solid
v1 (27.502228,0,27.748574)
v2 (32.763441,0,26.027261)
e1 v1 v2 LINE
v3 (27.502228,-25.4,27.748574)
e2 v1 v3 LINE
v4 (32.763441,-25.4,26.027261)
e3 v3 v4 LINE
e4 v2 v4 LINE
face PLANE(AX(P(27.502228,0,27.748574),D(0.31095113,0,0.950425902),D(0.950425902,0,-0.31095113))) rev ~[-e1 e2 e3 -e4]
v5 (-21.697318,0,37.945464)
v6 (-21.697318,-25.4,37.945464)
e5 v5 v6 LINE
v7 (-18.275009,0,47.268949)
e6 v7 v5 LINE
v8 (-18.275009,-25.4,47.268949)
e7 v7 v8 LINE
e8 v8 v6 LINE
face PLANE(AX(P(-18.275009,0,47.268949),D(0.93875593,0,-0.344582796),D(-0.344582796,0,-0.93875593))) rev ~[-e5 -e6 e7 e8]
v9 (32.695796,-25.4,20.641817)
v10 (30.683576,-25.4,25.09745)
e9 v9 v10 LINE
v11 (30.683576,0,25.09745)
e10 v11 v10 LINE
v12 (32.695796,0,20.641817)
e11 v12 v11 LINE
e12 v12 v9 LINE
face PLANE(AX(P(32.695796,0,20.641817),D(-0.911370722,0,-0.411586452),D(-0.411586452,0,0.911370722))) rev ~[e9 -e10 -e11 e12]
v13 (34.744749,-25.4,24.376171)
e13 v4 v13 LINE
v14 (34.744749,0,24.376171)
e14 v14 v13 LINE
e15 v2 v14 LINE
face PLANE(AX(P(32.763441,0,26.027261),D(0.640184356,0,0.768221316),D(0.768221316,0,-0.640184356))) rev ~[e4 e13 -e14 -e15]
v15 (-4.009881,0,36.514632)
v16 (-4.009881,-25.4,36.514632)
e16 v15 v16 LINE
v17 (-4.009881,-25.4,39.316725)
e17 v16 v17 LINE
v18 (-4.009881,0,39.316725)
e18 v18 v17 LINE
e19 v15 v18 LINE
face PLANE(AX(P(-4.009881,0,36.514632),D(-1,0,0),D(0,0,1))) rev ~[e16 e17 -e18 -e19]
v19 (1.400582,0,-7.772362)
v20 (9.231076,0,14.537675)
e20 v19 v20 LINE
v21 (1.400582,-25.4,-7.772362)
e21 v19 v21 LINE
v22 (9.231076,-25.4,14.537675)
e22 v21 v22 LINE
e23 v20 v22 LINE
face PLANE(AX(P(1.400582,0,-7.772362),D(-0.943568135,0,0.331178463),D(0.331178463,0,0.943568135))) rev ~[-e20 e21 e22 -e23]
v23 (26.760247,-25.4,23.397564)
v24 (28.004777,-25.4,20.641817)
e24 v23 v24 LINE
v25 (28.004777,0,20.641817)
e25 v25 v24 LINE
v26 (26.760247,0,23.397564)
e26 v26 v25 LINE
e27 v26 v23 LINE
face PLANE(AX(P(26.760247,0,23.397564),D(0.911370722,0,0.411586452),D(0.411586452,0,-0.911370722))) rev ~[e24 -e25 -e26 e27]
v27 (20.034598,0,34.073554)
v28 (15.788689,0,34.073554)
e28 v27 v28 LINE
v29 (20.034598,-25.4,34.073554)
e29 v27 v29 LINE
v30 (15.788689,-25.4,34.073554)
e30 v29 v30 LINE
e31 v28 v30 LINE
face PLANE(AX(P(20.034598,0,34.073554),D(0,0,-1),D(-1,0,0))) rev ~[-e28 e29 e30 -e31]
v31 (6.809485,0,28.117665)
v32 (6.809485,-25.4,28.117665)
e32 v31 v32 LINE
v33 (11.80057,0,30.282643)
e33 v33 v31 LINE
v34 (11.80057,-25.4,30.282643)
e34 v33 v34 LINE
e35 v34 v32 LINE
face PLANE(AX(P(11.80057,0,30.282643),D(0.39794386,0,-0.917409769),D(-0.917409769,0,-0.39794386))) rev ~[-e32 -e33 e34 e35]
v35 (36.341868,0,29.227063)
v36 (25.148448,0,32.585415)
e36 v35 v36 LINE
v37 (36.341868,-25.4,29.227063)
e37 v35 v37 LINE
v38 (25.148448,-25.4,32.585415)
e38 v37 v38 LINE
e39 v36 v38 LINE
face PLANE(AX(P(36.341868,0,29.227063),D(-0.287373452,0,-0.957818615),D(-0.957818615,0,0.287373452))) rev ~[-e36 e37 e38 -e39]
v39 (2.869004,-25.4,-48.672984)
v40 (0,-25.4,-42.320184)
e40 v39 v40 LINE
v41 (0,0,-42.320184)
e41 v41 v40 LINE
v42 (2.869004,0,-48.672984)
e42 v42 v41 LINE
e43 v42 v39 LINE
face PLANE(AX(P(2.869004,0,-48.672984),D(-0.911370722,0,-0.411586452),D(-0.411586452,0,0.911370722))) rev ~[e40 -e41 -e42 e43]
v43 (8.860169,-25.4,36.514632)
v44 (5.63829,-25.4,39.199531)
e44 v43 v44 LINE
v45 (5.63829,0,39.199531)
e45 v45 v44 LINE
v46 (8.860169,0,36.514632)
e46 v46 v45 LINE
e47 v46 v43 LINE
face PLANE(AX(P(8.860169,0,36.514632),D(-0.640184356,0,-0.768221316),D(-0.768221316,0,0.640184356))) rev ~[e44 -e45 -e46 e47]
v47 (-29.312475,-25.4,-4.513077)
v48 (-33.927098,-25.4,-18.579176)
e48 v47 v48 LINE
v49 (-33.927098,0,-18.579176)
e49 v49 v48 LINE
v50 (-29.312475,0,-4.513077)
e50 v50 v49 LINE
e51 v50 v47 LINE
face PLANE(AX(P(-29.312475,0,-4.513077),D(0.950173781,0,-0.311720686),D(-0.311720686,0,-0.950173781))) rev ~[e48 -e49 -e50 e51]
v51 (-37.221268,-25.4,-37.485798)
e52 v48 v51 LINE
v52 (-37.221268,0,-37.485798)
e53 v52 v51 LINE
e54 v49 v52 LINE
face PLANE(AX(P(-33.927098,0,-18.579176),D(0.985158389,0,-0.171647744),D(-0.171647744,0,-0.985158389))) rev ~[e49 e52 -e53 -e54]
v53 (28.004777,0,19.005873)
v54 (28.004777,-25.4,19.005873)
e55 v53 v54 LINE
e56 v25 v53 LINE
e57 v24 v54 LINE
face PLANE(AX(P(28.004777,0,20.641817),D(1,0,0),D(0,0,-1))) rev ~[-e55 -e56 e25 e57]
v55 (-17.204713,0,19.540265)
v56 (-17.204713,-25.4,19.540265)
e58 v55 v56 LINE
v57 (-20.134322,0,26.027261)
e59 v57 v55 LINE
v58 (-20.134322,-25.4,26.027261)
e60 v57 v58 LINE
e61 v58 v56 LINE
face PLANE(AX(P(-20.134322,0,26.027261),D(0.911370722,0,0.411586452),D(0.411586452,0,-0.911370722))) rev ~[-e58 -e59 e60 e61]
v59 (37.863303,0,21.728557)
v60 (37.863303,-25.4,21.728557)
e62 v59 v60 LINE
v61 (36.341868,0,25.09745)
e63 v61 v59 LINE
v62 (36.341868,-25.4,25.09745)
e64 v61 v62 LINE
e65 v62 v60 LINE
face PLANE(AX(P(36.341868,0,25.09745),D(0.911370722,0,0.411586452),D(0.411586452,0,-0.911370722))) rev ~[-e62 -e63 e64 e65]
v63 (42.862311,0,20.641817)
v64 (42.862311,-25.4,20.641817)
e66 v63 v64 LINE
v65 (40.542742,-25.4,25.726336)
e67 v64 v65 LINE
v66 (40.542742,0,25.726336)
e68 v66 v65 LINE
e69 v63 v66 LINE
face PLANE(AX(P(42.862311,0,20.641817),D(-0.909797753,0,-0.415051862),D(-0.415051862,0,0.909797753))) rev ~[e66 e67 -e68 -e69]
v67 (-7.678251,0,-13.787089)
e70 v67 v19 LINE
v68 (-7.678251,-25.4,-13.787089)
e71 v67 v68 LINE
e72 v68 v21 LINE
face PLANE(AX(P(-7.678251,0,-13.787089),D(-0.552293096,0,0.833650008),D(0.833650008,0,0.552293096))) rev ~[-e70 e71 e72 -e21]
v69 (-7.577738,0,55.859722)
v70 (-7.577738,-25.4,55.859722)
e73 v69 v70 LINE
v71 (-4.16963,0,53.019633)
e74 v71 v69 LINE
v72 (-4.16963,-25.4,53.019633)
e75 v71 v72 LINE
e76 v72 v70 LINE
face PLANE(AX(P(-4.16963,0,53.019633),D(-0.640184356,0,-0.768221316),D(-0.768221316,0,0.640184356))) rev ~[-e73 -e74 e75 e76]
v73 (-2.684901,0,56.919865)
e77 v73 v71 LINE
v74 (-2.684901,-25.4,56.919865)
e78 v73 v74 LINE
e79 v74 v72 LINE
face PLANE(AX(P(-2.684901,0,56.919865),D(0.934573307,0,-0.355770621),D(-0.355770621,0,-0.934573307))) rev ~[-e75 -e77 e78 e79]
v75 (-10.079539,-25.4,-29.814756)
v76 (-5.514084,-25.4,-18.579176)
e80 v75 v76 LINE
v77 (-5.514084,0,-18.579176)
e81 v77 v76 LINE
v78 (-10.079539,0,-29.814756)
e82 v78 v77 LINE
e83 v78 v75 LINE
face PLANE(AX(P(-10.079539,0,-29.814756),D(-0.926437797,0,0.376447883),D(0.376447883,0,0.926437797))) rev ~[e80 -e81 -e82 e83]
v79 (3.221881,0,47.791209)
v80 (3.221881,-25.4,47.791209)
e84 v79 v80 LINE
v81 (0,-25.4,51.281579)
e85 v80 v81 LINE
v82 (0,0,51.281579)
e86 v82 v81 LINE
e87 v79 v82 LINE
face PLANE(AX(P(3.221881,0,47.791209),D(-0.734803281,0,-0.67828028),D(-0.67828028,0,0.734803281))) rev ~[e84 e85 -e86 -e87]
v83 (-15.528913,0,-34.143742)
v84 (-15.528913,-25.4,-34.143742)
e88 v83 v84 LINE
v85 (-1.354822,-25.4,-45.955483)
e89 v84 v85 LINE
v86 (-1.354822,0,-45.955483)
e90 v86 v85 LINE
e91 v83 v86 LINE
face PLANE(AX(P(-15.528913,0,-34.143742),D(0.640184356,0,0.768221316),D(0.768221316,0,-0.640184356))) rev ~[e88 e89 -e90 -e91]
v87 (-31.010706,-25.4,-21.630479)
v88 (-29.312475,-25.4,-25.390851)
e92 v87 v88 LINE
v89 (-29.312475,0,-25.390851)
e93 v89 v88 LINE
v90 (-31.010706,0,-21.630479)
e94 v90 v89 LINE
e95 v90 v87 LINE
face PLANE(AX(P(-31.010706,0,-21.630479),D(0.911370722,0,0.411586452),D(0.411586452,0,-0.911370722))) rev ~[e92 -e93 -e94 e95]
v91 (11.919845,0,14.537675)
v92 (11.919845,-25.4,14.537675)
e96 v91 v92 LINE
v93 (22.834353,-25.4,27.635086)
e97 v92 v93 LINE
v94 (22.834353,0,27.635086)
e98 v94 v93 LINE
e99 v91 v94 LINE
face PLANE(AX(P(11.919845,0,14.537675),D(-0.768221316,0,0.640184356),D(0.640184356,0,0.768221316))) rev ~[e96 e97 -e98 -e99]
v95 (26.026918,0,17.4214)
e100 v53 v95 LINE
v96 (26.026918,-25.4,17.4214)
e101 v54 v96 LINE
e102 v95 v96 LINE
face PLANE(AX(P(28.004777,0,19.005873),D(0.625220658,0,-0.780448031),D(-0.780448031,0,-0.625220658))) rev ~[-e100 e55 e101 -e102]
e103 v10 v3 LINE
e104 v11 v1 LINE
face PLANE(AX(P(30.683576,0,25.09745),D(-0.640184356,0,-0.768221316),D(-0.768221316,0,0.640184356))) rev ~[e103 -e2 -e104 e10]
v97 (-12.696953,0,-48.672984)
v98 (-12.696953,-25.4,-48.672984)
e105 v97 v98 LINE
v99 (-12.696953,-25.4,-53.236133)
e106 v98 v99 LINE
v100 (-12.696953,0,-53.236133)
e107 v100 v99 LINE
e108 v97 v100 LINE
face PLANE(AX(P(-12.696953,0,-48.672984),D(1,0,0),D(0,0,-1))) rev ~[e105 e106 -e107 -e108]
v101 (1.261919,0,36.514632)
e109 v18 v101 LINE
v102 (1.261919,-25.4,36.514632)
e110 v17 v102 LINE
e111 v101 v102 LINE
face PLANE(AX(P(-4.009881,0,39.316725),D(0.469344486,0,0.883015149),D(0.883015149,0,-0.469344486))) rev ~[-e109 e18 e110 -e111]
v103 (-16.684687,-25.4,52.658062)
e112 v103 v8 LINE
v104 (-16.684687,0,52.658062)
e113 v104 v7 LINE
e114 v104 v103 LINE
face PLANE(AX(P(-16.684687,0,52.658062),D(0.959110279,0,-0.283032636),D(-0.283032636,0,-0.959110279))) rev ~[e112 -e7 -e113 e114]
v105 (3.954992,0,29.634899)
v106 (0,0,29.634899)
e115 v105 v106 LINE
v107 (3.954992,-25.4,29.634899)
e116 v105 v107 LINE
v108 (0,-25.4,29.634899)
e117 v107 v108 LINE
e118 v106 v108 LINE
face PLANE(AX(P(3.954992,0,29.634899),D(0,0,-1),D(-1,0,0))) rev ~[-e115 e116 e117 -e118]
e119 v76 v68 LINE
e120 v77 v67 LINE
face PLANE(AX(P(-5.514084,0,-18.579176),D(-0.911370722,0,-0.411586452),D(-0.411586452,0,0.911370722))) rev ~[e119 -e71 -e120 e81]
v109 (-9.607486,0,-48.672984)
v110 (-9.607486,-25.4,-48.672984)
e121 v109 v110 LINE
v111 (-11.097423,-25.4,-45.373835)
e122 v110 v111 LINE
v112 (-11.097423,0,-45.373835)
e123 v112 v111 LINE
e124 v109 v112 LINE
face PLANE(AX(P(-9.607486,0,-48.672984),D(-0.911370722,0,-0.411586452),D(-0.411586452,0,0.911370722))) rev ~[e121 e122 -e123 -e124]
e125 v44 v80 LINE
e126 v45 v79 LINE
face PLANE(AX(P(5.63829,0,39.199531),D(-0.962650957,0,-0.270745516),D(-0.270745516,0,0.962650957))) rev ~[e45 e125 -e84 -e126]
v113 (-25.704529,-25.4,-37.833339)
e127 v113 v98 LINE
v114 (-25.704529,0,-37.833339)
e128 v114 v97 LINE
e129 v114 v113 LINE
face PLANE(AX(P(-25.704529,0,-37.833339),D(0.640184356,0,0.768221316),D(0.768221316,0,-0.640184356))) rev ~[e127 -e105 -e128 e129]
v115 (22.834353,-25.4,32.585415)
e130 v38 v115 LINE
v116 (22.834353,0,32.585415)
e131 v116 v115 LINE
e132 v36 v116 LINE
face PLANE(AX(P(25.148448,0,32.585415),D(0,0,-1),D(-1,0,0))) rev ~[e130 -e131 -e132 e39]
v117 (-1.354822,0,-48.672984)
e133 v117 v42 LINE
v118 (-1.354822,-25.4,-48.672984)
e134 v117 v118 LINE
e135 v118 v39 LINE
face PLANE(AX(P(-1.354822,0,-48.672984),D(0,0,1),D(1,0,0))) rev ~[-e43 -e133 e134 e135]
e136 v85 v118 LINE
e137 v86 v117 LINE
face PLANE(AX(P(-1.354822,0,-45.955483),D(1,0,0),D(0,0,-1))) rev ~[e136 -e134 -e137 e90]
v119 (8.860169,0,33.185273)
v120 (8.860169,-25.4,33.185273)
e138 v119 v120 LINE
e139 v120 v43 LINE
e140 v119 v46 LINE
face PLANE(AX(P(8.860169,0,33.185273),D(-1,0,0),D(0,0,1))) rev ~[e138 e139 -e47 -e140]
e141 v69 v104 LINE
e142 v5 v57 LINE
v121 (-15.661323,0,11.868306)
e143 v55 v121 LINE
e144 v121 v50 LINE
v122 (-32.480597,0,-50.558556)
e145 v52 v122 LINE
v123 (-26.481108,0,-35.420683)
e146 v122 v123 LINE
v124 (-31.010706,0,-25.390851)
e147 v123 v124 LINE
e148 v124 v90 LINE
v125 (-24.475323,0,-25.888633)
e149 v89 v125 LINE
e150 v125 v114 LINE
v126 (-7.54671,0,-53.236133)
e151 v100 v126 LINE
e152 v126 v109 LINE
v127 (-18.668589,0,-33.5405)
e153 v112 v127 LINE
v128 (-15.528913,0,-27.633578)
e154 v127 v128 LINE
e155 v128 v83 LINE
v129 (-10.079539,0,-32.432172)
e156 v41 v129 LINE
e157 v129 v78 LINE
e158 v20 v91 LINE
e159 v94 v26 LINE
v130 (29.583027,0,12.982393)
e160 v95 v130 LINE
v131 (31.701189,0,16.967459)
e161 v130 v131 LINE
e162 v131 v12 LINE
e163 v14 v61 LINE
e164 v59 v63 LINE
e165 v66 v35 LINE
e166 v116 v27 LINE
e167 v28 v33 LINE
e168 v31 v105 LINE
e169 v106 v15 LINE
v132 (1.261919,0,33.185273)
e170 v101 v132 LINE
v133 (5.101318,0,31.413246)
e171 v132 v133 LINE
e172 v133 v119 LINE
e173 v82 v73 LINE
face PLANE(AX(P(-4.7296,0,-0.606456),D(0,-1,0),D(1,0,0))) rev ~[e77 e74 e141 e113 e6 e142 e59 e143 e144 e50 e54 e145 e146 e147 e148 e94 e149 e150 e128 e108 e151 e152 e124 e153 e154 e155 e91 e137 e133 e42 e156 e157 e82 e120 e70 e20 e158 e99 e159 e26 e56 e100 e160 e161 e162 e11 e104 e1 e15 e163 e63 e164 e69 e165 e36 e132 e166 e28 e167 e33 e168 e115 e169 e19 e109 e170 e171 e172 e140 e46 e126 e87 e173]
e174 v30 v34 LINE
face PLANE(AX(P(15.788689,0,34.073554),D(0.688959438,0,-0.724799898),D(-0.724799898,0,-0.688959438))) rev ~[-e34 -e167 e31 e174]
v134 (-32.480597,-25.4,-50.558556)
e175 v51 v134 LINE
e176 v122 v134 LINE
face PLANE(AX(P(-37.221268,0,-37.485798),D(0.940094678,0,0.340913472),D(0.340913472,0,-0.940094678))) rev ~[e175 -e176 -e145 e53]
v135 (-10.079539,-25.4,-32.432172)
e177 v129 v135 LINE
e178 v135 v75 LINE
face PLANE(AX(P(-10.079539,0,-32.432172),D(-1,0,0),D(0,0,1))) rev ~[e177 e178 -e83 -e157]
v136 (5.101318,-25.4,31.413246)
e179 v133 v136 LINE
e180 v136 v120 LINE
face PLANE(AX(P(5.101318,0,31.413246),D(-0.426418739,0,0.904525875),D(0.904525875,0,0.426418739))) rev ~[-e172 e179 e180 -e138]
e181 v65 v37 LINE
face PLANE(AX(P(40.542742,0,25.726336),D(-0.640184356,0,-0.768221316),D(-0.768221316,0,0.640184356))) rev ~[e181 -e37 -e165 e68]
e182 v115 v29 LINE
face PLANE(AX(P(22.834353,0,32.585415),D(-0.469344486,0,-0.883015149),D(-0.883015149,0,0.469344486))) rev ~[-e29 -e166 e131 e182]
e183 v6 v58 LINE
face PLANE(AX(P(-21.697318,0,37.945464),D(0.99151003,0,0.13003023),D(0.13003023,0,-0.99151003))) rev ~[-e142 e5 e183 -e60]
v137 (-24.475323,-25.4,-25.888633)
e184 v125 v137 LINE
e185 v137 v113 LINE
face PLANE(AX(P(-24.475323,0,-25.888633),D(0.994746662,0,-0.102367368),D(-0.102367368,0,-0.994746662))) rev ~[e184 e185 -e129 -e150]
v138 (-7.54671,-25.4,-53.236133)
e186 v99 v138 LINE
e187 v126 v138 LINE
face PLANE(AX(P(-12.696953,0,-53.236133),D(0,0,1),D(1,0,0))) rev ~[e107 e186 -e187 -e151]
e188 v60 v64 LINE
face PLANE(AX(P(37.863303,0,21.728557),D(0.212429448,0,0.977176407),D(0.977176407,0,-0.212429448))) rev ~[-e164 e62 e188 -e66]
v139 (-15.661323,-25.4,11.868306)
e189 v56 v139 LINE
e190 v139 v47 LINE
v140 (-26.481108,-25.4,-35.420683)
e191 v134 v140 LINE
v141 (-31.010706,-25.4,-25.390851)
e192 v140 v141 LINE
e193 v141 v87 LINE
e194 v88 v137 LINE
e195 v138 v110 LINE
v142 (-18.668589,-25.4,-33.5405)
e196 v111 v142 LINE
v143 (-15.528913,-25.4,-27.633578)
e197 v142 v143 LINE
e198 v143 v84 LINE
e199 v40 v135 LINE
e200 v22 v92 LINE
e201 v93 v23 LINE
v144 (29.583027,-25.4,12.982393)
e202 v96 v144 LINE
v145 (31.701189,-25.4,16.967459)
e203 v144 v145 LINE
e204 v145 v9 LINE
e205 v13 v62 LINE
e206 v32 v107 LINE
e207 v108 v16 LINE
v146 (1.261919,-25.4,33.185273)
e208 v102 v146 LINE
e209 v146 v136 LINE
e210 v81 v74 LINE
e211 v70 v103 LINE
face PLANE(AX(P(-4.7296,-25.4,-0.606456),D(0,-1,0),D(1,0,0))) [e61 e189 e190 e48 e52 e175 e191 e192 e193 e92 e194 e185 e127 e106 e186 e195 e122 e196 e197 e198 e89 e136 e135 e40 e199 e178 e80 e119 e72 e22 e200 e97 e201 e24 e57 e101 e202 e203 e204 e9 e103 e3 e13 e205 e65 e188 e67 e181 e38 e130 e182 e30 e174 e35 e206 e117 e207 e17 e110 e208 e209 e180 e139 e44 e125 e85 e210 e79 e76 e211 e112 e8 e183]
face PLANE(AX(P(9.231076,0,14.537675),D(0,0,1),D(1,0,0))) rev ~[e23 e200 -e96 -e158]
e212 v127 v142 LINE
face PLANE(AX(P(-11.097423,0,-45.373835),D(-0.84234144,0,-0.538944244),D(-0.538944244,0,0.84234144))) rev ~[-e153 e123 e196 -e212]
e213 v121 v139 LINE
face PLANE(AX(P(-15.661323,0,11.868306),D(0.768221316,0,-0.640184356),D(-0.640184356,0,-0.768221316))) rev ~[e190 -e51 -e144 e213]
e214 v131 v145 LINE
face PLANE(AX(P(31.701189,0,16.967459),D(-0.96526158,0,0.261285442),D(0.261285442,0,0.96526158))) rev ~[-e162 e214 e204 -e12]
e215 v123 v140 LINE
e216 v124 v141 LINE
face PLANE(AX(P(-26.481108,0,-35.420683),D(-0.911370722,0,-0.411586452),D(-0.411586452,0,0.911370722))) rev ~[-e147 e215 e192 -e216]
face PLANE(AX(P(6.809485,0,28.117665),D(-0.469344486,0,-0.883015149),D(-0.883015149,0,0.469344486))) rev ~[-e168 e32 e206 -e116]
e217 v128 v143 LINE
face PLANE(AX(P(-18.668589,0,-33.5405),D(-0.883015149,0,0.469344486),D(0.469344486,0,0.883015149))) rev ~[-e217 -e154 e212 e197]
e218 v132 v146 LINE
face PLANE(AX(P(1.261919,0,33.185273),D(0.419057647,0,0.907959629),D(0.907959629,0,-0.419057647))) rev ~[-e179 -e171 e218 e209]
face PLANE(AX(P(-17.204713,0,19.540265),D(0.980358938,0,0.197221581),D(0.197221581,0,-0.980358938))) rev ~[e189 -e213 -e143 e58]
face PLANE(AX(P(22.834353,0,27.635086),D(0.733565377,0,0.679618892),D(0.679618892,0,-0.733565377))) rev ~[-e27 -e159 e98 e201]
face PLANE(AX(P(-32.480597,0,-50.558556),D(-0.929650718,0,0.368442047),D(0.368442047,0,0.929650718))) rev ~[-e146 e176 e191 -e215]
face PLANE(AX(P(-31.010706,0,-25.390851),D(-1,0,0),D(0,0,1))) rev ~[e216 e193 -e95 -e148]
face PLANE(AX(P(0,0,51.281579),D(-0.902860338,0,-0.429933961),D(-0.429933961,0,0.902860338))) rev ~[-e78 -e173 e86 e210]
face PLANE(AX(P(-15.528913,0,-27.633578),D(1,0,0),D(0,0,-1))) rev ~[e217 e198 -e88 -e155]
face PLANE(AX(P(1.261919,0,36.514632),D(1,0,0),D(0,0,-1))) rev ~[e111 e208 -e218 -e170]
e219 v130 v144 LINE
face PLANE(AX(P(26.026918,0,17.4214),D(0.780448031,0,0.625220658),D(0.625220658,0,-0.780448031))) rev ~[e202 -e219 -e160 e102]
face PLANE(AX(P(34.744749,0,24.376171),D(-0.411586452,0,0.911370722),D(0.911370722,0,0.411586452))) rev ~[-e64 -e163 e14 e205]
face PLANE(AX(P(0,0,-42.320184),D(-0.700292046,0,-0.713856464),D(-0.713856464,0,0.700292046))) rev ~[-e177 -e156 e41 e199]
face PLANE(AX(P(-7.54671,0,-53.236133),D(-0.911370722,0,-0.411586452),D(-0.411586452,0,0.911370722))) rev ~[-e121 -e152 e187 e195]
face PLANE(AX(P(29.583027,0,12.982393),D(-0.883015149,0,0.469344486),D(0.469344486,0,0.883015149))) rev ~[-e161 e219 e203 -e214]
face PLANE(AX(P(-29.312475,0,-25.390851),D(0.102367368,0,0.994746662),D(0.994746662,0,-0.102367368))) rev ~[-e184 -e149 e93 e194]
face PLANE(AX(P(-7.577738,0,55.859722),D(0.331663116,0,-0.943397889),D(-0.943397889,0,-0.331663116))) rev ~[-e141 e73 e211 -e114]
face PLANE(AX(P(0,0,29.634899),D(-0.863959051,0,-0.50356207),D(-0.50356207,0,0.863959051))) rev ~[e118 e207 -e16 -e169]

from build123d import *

# Parameters (mm, degrees)
F1_DEPTH = 25.4


# Not quite as in the source:
# - ends of sketch curves that miss each other by under 0.0002 mm in the source are joined


with BuildPart() as f1:
    # F0 (on Front) → F1 (new body)
    with BuildSketch(Plane.XZ):
        Polygon((0, 51.2815788388), (-2.6849012356, 56.9198653102), (-4.1696302487, 53.0196329049), (-7.5777377933, 55.8597221971), (-16.6846867651, 52.6580624282), (-18.2750094682, 47.2689494491), (-21.6973181814, 37.9454642534), (-20.1343216481, 26.0272607351), (-17.2047130764, 19.5402652025), (-15.6613234345, 11.8683064511), (-29.3124747088, -4.5130769722), (-33.9270979166, -18.5791757945), (-37.2212677423, -37.4857979189), (-32.480597056, -50.5585558089), (-26.4811083451, -35.4206826298), (-31.0107059295, -25.3908514852), (-31.0107059295, -21.6304793835), (-29.3124747088, -25.3908514852), (-24.4753230363, -25.888632983), (-25.7045285945, -37.8333391404), (-12.6969534904, -48.6729838072), (-12.6969534904, -53.2361328939), (-7.5467102784, -53.2361328939), (-9.6074856576, -48.6729838072), (-11.097422801, -45.3738346696), (-18.6685893591, -33.5405004938), (-15.5289131012, -27.6335775852), (-15.5289131012, -34.1437415194), (-1.3548218412, -45.9554828703), (-1.3548218412, -48.6729838072), (2.8690039134, -48.6729838072), (0, -42.3201844096), (-10.079539381, -32.4321724474), (-10.079539381, -29.8147555441), (-5.5140842237, -18.5791757945), (-7.6782507822, -13.7870889157), (1.4005823759, -7.7723623253), (9.2310756445, 14.5376751978), (11.9198445967, 14.5376751978), (22.8343526097, 27.6350863278), (26.7602472754, 23.3975637498), (28.004777182, 20.64181678), (28.004777182, 19.005872948), (26.0269176215, 17.4214001745), (29.5830273071, 12.9823932965), (31.7011885345, 16.9674586505), (32.6957959123, 20.64181678), (30.6835759384, 25.0974502414), (27.5022275746, 27.7485735714), (32.7634411399, 26.0272607351), (34.7447489485, 24.3761710855), (36.341868341, 25.0974502414), (37.8633029759, 21.7285566032), (42.8623110056, 20.64181678), (40.5427415461, 25.7263357936), (36.341868341, 29.2270630598), (25.148447603, 32.5854149557), (22.8343526097, 32.5854149557), (20.0345981866, 34.0735539794), (15.7886892557, 34.0735539794), (11.8005704135, 30.2826426923), (6.8094845357, 28.1176646778), (3.9549916983, 29.6348985285), (0, 29.6348985285), (-4.0098810568, 36.5146324039), (-4.0098810568, 39.3167249858), (1.2619188055, 36.5146324039), (1.2619188055, 33.1852734089), (5.1013175398, 31.4132459462), (8.8601689786, 33.1852734089), (8.8601689786, 36.5146324039), (5.6382901967, 39.1995310783), (3.2218813431, 47.7912090719), align=None)
    extrude(amount=F1_DEPTH)


solid = f1.part
